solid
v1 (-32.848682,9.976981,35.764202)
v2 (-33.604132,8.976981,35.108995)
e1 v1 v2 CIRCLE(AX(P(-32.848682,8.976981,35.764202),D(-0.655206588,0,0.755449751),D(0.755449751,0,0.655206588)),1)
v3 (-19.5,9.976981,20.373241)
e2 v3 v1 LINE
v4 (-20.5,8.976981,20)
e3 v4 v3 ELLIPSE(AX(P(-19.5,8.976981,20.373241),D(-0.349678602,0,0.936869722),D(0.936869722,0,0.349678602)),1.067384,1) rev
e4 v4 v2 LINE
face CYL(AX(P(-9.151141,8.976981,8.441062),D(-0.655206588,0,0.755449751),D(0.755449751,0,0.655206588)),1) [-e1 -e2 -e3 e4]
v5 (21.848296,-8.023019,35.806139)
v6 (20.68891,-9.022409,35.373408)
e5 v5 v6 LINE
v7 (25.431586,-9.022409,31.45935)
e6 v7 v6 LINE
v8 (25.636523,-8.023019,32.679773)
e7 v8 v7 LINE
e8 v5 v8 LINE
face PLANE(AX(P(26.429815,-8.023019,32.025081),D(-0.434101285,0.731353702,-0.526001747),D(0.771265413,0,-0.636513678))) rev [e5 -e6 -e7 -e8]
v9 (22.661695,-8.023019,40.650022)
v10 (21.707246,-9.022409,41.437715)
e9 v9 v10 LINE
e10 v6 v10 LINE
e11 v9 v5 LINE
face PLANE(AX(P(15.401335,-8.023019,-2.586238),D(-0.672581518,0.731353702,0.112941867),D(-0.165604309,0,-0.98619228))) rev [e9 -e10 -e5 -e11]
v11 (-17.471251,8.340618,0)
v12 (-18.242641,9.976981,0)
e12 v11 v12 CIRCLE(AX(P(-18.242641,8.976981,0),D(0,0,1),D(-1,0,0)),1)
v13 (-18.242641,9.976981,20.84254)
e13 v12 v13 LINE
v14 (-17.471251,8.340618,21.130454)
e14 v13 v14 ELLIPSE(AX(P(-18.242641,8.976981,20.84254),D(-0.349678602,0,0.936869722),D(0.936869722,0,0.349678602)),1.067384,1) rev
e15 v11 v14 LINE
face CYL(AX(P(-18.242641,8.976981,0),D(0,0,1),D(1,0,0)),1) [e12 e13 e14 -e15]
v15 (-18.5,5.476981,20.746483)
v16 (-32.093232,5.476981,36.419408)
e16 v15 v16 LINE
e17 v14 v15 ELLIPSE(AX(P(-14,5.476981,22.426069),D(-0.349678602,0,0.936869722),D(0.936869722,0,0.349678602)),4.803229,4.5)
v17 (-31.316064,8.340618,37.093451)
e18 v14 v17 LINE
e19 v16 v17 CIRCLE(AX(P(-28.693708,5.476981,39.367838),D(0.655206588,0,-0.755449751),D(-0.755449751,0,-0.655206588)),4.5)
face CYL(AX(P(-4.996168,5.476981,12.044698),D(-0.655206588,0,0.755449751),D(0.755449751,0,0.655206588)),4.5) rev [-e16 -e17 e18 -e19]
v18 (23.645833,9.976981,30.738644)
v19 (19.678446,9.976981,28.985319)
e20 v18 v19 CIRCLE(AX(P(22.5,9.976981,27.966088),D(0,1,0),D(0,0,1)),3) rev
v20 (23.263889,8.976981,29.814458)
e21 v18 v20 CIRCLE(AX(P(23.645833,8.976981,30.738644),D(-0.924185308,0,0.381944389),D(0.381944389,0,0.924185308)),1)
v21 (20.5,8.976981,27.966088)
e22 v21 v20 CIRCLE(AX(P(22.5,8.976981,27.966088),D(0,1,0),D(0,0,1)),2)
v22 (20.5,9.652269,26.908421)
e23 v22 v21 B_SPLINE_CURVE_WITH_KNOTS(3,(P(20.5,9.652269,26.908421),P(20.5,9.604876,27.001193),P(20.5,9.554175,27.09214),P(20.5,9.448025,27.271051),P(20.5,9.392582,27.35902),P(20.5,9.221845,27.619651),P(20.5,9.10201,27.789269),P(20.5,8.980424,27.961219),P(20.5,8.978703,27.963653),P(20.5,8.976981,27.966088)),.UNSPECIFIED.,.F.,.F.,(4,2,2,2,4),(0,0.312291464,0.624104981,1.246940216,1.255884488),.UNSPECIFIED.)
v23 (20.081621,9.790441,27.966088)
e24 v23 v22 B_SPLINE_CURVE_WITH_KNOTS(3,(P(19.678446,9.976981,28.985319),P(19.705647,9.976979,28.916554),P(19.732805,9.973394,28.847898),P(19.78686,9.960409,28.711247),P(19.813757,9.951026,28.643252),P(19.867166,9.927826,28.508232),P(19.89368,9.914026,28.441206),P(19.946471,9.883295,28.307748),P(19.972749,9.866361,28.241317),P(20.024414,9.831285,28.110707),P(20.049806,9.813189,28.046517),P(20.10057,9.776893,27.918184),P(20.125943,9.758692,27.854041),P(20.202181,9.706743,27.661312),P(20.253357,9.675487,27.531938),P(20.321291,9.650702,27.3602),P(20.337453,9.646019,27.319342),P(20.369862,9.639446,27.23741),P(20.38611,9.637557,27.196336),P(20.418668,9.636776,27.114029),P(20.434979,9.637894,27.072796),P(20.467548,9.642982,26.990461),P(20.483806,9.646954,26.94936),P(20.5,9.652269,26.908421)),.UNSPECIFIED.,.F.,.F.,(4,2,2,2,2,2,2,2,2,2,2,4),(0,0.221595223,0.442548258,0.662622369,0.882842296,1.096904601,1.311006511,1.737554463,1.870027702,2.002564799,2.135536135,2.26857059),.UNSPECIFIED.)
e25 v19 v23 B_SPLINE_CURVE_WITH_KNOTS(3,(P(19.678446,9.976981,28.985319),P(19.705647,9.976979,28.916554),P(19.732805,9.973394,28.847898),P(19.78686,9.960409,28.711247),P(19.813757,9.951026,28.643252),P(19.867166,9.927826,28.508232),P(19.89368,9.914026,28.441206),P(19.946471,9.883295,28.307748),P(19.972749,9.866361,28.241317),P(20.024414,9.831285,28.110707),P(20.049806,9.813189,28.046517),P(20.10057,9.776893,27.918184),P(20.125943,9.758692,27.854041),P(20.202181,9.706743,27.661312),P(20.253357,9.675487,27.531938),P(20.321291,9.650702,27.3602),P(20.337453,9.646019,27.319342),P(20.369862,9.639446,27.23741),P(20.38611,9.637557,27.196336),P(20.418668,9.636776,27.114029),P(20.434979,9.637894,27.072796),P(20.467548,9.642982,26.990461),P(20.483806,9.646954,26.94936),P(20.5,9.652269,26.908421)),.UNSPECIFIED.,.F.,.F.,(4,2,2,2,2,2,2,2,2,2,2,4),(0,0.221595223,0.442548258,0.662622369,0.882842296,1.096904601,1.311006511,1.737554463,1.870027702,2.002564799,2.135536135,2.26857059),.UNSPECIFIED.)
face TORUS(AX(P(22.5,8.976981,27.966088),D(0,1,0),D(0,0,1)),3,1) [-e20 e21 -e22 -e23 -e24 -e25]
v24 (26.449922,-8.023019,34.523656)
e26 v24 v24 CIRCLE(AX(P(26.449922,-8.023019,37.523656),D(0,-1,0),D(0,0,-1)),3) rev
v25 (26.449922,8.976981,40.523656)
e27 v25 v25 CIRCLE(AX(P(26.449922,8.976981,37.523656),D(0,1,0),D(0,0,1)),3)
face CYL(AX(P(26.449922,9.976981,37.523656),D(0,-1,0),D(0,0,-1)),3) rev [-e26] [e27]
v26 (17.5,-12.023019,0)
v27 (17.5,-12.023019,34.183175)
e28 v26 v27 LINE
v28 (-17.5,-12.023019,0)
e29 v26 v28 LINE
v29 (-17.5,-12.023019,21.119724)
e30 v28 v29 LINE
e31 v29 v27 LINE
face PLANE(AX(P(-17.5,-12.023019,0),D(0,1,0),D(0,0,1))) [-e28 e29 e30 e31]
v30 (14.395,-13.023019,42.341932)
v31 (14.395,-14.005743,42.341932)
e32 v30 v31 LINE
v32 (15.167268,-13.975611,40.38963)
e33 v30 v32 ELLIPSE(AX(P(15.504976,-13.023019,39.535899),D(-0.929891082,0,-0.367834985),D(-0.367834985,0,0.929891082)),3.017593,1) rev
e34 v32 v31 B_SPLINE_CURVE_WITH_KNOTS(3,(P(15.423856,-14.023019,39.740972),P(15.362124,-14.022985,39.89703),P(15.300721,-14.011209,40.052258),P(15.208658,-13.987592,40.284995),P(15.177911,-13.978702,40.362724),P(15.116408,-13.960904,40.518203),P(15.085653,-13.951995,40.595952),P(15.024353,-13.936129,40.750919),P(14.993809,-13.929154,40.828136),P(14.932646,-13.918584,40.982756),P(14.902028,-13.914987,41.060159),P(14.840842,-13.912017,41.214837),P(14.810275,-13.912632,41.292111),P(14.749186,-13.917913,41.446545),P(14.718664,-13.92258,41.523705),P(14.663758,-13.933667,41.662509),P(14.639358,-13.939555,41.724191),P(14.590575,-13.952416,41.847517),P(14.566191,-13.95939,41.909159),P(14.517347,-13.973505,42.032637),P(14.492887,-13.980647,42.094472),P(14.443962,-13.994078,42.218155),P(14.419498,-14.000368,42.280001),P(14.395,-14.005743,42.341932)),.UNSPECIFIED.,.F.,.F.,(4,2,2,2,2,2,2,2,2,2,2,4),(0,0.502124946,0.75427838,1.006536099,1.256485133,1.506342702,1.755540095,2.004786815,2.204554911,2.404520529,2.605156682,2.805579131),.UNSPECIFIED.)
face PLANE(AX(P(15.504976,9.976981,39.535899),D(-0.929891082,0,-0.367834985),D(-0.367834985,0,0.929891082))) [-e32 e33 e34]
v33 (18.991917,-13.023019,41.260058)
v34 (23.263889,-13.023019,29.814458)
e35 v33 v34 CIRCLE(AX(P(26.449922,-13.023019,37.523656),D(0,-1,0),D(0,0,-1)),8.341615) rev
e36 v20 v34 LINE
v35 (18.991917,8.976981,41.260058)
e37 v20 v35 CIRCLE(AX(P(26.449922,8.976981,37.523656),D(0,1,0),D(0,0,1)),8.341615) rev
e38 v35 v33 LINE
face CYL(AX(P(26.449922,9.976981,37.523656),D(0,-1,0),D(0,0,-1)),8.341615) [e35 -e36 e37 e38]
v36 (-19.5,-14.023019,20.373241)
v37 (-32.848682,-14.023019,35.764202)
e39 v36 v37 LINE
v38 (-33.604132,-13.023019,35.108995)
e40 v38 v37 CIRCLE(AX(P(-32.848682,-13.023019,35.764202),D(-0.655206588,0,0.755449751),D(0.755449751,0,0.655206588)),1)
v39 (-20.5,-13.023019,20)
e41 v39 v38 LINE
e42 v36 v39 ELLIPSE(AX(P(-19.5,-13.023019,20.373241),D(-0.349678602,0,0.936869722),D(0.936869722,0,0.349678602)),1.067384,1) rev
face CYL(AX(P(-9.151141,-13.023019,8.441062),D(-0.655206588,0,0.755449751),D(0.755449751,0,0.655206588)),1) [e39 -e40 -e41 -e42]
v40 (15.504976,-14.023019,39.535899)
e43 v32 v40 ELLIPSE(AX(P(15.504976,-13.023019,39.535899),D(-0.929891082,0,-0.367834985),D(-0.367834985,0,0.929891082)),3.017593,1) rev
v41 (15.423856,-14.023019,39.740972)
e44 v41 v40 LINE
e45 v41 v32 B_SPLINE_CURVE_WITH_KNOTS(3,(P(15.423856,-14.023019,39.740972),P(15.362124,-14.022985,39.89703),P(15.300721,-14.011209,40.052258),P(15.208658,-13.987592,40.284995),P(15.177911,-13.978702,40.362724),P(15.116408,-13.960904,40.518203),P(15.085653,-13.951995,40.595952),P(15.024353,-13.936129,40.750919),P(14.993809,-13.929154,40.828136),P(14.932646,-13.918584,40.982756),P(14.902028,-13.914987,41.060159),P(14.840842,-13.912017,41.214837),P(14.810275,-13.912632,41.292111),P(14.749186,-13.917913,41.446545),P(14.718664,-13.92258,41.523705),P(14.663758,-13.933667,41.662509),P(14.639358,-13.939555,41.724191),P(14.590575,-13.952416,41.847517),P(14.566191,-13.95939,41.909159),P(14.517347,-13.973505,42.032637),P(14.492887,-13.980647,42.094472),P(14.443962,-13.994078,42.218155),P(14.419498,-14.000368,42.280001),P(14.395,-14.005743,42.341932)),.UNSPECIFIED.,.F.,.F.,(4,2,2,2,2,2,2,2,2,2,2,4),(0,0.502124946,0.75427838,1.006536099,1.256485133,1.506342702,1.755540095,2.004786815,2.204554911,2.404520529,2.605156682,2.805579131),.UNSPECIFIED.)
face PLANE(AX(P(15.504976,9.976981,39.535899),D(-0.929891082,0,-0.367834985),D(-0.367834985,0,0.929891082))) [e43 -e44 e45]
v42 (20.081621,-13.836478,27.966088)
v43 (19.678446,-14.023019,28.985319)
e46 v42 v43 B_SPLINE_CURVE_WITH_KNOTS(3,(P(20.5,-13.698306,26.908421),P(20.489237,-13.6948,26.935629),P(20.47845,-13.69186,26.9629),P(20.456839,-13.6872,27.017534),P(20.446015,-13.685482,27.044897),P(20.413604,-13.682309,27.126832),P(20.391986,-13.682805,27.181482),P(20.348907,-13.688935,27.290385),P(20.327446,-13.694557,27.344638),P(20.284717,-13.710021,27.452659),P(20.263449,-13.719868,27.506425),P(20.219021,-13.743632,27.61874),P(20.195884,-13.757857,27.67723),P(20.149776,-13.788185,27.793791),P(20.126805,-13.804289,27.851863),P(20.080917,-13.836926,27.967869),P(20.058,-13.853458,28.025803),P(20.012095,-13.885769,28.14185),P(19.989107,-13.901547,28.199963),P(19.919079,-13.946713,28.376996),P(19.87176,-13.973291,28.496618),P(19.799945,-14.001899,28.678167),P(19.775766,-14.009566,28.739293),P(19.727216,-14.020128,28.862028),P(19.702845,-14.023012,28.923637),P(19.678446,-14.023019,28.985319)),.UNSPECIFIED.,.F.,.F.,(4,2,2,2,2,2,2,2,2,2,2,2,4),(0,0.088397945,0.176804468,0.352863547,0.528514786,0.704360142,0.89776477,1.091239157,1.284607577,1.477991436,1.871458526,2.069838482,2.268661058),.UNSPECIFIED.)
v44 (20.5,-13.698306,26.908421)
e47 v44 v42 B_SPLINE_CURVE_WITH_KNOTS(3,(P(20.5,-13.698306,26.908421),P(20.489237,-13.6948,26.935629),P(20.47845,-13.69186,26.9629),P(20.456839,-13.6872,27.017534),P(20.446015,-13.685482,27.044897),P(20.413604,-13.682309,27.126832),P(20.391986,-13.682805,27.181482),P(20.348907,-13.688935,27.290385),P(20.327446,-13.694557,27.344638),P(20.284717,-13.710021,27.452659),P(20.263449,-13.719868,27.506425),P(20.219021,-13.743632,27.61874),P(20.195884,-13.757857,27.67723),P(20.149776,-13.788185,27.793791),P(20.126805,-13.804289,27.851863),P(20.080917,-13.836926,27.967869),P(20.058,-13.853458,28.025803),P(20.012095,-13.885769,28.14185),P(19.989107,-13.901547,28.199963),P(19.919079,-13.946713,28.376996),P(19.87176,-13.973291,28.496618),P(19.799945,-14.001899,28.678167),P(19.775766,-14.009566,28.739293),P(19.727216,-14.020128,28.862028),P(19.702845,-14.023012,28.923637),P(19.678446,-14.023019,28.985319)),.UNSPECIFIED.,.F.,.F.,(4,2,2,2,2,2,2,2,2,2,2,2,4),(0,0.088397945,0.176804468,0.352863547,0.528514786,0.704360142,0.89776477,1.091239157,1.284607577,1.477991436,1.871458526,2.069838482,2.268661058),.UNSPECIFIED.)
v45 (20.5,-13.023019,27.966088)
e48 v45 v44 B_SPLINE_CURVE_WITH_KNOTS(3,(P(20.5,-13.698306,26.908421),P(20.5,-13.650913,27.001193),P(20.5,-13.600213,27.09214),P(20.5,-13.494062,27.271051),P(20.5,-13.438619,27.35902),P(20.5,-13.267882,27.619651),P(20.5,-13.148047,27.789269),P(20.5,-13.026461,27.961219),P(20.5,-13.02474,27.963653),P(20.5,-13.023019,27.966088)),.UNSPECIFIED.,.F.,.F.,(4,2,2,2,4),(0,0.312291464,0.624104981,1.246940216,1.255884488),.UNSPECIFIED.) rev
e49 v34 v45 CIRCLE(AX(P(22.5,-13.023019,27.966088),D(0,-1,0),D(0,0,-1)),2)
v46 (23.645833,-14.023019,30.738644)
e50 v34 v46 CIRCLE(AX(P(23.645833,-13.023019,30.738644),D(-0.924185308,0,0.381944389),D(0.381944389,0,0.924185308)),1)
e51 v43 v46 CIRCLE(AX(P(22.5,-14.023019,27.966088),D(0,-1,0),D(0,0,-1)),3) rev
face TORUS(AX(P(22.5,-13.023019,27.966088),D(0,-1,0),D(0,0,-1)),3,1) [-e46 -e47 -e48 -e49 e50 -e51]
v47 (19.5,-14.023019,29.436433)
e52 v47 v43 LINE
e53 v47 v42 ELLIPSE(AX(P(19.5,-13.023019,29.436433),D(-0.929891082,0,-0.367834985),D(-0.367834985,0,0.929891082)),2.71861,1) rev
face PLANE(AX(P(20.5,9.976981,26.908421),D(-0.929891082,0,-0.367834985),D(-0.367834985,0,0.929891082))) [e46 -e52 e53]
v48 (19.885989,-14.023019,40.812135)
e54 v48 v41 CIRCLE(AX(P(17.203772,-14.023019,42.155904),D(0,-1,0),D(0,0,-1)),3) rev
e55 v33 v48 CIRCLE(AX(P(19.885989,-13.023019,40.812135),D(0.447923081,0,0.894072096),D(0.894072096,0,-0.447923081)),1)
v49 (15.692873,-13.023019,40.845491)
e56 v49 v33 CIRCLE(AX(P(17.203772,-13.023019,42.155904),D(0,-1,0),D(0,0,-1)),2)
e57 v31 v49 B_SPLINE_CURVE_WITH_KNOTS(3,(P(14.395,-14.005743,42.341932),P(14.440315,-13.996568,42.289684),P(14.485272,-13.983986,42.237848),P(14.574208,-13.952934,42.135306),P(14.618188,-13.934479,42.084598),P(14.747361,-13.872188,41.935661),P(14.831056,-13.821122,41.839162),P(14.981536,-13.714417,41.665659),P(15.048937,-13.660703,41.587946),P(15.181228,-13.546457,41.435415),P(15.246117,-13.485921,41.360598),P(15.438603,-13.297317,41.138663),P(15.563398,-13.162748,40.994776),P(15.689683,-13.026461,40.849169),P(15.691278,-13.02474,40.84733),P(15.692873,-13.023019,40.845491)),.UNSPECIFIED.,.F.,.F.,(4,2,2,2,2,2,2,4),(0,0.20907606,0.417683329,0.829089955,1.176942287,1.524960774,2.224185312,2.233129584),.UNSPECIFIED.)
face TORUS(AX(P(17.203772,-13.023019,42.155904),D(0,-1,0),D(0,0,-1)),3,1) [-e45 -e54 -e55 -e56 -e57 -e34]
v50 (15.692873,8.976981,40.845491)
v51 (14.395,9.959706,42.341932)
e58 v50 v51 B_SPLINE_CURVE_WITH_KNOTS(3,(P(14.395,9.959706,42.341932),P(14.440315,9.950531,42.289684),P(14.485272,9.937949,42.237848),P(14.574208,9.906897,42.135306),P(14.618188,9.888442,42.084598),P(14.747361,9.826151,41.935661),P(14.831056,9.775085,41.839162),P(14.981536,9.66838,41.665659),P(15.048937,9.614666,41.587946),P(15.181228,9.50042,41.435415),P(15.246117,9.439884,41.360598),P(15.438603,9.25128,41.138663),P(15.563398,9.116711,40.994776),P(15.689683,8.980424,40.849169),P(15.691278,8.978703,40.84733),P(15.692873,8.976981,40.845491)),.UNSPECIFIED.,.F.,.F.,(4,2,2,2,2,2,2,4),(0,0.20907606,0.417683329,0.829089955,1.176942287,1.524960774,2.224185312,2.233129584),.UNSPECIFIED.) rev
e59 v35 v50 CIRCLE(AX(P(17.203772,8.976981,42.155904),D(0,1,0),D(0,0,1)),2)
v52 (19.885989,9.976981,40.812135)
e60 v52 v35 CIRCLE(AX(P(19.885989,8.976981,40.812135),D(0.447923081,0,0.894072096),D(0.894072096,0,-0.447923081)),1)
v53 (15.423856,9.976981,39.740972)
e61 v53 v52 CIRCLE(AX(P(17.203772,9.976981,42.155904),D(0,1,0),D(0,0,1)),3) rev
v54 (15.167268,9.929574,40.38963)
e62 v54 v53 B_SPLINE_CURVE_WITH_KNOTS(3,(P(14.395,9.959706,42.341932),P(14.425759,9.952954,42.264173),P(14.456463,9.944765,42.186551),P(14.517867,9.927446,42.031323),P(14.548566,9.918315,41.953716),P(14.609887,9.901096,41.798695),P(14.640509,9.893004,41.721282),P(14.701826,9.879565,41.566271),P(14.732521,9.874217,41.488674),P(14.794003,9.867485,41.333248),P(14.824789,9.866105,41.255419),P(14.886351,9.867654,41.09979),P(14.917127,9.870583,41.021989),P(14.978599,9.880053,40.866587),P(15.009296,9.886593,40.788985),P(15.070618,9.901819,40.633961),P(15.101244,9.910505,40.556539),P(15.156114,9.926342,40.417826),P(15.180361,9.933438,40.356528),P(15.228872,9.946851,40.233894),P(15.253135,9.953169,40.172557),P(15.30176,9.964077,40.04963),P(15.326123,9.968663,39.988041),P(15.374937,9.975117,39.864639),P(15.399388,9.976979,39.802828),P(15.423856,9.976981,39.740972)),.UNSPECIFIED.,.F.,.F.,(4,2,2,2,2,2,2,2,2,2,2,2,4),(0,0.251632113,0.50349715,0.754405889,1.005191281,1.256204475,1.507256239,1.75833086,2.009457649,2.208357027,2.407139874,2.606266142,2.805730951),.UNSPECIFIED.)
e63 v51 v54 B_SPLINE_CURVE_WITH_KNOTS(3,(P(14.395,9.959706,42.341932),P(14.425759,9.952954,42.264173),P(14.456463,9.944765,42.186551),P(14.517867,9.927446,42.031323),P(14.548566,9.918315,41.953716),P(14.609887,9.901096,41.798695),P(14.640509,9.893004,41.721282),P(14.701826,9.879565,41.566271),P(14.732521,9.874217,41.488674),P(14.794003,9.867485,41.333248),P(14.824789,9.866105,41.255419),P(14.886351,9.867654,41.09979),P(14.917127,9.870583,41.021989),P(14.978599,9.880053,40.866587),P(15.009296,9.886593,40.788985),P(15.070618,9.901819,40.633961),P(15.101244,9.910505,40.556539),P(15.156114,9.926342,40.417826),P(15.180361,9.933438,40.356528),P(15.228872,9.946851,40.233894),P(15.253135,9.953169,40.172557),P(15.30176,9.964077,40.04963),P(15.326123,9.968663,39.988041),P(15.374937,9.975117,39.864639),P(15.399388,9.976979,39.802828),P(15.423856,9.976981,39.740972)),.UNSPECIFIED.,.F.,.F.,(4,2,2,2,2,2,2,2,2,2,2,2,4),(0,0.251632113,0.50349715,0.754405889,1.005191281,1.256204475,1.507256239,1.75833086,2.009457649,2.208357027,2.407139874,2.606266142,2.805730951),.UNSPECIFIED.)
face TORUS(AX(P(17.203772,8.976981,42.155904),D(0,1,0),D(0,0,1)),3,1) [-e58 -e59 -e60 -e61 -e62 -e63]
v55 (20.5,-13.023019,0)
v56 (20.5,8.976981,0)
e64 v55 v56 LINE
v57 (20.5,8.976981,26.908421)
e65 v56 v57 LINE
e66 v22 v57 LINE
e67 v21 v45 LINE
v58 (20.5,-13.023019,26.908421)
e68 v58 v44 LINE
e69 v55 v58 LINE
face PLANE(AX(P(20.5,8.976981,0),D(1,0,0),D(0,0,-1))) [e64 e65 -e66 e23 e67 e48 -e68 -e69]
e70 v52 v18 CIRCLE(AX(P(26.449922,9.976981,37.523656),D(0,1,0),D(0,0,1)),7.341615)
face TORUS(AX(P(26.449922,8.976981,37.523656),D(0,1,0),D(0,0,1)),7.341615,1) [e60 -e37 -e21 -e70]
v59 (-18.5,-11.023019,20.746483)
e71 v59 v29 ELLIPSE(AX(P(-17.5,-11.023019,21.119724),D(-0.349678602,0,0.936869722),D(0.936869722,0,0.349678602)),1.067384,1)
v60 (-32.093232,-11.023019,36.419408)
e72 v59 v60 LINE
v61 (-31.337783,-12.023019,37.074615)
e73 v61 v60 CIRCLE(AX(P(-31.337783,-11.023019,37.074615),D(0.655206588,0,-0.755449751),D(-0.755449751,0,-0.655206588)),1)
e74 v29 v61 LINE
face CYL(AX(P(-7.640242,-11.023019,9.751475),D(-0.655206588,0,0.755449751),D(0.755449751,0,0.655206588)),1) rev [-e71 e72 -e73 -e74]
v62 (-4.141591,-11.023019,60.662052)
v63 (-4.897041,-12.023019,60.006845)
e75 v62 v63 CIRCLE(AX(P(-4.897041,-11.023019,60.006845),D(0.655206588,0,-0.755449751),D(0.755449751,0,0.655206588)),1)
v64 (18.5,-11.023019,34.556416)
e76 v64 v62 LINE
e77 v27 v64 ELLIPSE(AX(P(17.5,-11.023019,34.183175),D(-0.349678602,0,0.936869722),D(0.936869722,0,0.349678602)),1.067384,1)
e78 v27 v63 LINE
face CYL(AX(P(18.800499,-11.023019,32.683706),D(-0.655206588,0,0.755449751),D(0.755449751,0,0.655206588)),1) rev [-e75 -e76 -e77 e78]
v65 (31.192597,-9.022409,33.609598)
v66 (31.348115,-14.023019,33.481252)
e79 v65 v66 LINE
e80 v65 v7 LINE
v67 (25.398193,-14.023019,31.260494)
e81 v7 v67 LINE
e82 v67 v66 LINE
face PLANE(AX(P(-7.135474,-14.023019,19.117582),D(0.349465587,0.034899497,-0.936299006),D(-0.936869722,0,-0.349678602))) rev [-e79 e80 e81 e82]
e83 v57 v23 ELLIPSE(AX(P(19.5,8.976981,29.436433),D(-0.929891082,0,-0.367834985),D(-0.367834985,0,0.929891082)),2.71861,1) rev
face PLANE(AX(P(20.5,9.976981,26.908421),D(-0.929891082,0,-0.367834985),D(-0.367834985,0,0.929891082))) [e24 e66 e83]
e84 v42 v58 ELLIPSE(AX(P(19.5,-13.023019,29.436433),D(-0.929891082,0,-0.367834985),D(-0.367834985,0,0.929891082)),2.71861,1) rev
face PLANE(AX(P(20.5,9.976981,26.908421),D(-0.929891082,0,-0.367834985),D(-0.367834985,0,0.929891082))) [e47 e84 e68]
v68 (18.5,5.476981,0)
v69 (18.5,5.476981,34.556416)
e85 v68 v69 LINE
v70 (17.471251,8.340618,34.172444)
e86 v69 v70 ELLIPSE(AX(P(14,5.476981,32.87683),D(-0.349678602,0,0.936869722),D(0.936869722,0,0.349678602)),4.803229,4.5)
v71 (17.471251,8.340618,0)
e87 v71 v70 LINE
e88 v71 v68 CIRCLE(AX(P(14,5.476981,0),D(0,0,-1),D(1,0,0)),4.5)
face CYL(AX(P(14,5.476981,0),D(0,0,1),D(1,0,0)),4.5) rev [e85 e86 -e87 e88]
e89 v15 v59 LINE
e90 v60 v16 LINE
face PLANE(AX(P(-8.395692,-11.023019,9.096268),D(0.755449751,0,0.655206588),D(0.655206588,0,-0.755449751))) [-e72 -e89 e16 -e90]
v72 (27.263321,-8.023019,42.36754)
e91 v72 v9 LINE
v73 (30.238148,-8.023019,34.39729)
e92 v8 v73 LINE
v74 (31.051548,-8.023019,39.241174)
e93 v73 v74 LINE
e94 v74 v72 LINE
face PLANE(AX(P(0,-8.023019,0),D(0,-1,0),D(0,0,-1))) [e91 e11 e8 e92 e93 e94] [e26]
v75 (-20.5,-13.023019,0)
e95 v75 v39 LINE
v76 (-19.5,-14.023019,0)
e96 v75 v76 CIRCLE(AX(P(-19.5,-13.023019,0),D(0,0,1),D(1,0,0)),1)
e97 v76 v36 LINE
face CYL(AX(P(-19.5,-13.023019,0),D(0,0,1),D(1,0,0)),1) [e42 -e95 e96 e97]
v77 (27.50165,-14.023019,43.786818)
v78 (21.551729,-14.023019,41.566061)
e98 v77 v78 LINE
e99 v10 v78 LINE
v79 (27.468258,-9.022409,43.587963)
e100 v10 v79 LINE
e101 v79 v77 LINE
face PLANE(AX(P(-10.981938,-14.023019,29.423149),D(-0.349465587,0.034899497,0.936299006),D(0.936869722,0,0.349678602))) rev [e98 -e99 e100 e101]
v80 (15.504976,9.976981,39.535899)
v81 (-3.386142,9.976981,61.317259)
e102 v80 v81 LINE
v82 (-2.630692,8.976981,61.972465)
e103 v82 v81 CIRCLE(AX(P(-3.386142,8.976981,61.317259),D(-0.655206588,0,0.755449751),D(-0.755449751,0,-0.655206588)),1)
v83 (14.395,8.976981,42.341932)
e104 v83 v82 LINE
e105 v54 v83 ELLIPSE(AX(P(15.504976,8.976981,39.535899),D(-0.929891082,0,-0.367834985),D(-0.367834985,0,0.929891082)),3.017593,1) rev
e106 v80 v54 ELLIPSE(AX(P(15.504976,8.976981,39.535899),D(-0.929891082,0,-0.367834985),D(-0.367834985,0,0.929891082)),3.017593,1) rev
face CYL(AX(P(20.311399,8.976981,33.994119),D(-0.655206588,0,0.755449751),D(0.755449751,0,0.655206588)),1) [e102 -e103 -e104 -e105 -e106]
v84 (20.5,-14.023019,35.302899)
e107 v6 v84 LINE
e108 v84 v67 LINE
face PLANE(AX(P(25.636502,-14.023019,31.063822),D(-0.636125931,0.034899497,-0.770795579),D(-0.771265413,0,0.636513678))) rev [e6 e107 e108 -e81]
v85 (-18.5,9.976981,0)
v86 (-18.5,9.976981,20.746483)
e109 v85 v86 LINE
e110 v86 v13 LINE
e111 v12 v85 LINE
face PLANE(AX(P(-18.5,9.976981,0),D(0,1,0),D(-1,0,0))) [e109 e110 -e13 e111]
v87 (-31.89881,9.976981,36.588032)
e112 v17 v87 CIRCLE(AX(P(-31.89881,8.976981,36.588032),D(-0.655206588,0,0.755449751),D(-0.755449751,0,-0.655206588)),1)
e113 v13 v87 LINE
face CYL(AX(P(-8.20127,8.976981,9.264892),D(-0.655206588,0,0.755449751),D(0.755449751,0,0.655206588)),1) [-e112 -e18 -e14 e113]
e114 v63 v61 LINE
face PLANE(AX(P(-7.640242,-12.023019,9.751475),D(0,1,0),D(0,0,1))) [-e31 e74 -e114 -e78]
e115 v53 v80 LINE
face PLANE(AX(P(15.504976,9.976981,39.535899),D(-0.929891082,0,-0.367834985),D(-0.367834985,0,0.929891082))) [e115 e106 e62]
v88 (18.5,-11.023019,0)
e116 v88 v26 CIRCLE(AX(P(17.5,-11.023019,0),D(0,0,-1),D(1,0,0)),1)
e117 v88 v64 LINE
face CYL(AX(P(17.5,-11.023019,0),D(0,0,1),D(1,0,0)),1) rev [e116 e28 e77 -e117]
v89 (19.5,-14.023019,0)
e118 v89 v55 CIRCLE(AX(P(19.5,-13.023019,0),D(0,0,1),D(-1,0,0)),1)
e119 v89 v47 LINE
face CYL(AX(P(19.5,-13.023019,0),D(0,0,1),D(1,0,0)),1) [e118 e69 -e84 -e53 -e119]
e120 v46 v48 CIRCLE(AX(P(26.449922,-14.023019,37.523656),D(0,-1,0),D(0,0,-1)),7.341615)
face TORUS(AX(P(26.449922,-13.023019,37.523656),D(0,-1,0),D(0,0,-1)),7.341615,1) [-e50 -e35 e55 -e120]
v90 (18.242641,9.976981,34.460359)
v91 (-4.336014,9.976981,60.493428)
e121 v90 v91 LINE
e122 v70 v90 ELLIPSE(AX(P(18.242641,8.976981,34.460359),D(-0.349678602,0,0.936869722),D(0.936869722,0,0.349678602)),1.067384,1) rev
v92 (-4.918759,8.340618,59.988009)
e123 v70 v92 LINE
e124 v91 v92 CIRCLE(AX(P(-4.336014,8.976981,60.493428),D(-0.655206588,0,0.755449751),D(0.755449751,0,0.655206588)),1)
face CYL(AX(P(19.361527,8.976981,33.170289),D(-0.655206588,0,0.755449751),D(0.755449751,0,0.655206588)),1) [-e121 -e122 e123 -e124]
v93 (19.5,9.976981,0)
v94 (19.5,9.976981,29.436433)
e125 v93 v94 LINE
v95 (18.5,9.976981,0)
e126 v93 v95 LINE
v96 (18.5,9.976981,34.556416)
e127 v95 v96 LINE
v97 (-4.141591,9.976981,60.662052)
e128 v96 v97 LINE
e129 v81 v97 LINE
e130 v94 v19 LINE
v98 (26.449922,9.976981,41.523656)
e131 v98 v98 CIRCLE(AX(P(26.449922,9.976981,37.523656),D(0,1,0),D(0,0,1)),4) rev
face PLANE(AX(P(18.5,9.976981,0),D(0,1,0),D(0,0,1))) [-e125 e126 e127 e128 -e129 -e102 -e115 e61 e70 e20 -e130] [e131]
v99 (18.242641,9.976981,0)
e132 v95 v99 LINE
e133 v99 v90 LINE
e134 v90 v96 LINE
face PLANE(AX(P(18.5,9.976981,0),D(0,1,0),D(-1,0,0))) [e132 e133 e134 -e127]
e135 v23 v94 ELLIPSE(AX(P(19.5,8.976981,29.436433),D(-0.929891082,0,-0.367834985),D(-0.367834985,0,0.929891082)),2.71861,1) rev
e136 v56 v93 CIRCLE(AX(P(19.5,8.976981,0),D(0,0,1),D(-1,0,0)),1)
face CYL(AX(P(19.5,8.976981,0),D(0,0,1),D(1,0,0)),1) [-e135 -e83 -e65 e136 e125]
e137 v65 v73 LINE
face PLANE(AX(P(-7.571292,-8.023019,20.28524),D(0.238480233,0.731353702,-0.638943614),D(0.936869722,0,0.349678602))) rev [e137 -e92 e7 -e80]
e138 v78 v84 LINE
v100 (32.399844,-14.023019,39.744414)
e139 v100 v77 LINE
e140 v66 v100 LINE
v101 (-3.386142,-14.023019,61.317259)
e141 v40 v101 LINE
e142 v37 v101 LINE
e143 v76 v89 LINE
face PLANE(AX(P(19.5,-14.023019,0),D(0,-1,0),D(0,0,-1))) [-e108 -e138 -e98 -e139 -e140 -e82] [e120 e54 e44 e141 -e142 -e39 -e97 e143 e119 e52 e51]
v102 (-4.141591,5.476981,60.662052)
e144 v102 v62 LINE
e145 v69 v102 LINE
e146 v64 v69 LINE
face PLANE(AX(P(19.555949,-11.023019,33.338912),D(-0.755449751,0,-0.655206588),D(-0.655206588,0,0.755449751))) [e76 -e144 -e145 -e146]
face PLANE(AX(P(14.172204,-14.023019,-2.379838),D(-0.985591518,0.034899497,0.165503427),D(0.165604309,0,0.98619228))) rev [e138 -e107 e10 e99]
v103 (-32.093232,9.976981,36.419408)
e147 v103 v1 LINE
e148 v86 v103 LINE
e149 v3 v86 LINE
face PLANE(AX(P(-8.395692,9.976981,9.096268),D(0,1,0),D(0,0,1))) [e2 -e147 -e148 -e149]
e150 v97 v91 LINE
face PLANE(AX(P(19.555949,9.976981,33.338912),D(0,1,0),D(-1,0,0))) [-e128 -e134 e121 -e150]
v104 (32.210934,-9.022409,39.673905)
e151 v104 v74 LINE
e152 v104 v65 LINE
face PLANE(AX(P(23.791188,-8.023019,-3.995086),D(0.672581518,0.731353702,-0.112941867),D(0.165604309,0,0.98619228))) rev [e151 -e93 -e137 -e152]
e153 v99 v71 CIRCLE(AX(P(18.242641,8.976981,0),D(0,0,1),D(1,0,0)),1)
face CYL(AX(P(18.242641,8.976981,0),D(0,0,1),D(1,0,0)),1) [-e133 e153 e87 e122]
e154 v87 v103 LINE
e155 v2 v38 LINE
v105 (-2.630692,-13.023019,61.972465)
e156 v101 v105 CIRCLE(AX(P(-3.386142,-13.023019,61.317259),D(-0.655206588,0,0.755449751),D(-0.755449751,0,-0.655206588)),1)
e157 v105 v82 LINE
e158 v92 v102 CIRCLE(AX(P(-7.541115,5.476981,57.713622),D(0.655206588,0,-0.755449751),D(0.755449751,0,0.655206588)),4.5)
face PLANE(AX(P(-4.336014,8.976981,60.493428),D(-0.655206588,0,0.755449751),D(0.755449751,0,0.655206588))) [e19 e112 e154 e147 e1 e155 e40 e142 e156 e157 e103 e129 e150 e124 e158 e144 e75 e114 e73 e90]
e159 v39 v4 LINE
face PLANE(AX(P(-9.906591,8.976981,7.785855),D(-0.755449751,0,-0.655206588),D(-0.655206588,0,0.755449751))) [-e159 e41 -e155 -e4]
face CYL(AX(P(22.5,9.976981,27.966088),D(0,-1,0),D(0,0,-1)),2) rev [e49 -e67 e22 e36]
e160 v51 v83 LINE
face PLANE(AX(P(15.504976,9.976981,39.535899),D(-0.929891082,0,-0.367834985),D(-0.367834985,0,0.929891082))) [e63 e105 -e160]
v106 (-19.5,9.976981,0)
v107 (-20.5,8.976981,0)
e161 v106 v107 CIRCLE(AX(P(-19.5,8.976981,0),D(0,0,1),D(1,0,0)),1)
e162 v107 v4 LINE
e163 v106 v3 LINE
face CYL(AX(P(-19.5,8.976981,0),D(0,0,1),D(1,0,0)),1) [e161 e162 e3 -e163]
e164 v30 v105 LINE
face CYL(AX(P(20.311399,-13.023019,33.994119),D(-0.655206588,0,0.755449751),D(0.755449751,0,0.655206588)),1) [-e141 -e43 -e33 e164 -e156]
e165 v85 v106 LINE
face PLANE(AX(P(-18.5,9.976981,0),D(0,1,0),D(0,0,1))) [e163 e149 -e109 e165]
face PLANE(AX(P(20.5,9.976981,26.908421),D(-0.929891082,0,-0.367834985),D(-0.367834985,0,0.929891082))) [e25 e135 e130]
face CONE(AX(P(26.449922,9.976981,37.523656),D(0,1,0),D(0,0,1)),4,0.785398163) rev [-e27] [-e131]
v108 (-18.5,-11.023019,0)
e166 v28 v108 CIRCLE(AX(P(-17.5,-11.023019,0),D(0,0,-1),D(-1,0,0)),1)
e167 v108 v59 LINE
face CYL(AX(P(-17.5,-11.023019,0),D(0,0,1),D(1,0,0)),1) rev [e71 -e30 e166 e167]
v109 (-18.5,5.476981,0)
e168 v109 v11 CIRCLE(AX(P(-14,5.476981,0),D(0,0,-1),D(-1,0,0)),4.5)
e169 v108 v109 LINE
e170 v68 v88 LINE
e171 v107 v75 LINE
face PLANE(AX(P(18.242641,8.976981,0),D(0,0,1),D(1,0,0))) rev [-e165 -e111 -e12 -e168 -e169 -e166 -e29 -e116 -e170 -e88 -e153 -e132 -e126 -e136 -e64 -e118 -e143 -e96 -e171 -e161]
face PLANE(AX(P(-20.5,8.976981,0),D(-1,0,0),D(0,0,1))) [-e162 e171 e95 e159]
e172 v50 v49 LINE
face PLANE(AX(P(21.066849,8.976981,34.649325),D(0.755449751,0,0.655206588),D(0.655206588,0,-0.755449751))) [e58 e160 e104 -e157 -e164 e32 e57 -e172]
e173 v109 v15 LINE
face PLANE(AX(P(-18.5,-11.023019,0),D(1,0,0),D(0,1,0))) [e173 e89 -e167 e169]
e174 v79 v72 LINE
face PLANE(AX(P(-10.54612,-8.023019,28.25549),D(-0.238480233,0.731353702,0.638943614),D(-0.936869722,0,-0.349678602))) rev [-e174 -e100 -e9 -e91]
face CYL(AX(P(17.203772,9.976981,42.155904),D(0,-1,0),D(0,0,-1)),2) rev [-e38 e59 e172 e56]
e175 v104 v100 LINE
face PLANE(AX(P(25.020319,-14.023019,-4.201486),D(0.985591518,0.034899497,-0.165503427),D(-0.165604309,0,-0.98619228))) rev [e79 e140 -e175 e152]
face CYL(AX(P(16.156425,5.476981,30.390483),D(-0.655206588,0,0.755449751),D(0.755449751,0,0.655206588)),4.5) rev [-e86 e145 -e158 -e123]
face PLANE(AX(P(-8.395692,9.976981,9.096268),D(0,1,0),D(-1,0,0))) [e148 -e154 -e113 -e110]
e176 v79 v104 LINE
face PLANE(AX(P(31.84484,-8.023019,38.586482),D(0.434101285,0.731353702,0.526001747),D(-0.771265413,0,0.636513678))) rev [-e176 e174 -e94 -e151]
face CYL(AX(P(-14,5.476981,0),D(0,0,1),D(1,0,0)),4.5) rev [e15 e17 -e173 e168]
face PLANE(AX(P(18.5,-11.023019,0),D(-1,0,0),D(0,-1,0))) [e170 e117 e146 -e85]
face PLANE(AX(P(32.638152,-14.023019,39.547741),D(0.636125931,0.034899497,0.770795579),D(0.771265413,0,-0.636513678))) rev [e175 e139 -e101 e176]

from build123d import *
from OCP.BRepFilletAPI import BRepFilletAPI_MakeChamfer

# Parameters (mm, degrees)
SKETCH4_R           = 3
BOSS_EXTRUDE2_DEPTH = 24
CUT_EXTRUDE2_DEPTH  = 6
CUT_EXTRUDE2_DRAFT  = -2
CHAMFER1_SIZE       = 1
CHAMFER1_SIZE2      = 1.036815955
FILLET2_R           = 1
FILLET3_R           = 1
CHAMFER2_SIZE       = 1


with BuildPart() as part:
    # Sweep1: sweep along a path in Sketch3
    with BuildLine(Plane(origin=(0, 0, 0), x_dir=(1, 0, 0), z_dir=(0, 1, 0))) as sweep1_path:
        Line((0, 0), (0, -27.651449467))
        Line((0, -27.651449467), (-18.11741187, -48.540730085))
    # Sketch1 → Sweep1 (sweep)
    with BuildSketch(Plane.XY):
        with BuildLine():
            Line((-17.5, -12.023018516), (17.5, -12.023018516))
            ThreePointArc((17.5, -12.023018516), (18.207106781, -11.730125297), (18.5, -11.023018516))
            Line((18.5, -11.023018516), (18.5, 5.476981484))
            ThreePointArc((18.5, 5.476981484), (18.235010721, 6.998390104), (17.471251471, 8.340617848))
            ThreePointArc((17.471251471, 8.340617848), (17.338106653, 9.403382917), (18.242640687, 9.976981484))
            Line((18.242640687, 9.976981484), (18.5, 9.976981484))
            Line((18.5, 9.976981484), (19.5, 9.976981484))
            ThreePointArc((19.5, 9.976981484), (20.207106781, 9.684088265), (20.5, 8.976981484))
            Line((20.5, 8.976981484), (20.5, -13.023018516))
            ThreePointArc((20.5, -13.023018516), (20.207106781, -13.730125297), (19.5, -14.023018516))
            Line((19.5, -14.023018516), (-19.5, -14.023018516))
            ThreePointArc((-19.5, -14.023018516), (-20.207106781, -13.730125297), (-20.5, -13.023018516))
            Line((-20.5, -13.023018516), (-20.5, 8.976981484))
            ThreePointArc((-20.5, 8.976981484), (-20.207106781, 9.684088265), (-19.5, 9.976981484))
            Line((-19.5, 9.976981484), (-18.5, 9.976981484))
            Line((-18.5, 9.976981484), (-18.242640687, 9.976981484))
            ThreePointArc((-18.242640687, 9.976981484), (-17.338106653, 9.403382917), (-17.471251471, 8.340617848))
            ThreePointArc((-17.471251471, 8.340617848), (-18.235010721, 6.998390104), (-18.5, 5.476981484))
            Line((-18.5, 5.476981484), (-18.5, -11.023018516))
            ThreePointArc((-18.5, -11.023018516), (-18.207106781, -11.730125297), (-17.5, -12.023018516))
        make_face()
    sweep(path=sweep1_path.line, transition=Transition.RIGHT)

    # Sketch4 → Boss-Extrude2 (add, through all)
    with BuildSketch(Plane(origin=(0, -14.023018516, 0), x_dir=(-1, 0, 0), z_dir=(0, -1, 0))):
        with BuildLine():
            Line((-20.5, -27.966087618), (-20.5, -26.908421005))
            Line((-20.5, -26.908421005), (-19.5, -29.43643253))
            Line((-19.5, -29.43643253), (-19.5, -34.929657496))
            Line((-19.5, -34.929657496), (-15.504976059, -39.535899093))
            Line((-15.504976059, -39.535899093), (-14.394999659, -42.341932225))
            Line((-14.394999659, -42.341932225), (-15.692872888, -40.845491216))
            ThreePointArc((-15.692872888, -40.845491216), (-17.453136797, -40.171510936), (-18.991916583, -41.260058232))
            ThreePointArc((-18.991916583, -41.260058232), (-34.264928426, -40.440540605), (-23.263888778, -29.814458234))
            ThreePointArc((-23.263888778, -29.814458234), (-21.388194612, -29.628582363), (-20.5, -27.966087618))
        make_face()
        with Locations(Location((-26.449921847, -37.523656316, 0), (0, 0, 90))):
            Circle(SKETCH4_R, mode=Mode.SUBTRACT)
    extrude(amount=-BOSS_EXTRUDE2_DEPTH)


with BuildPart() as cut_extrude2_tool:
    # Sketch5 → Cut-Extrude2 (with draft: the straight prism first)
    with BuildSketch(Plane(origin=(0, -14.023018516, 0), x_dir=(-1, 0, 0), z_dir=(0, -1, 0))):
        Polygon((-27.501650461, -43.786818477), (-21.551728614, -41.566061095), (-20.5, -35.302898934), (-25.398193232, -31.260494155), (-31.348115079, -33.481251538), (-32.399843693, -39.744413699), align=None)
    extrude(amount=-CUT_EXTRUDE2_DEPTH)
    # Cut-Extrude2: the draft: its side faces are tilted about the plane it starts from
    cut_extrude2_sides = [cut_extrude2_tool.faces().sort_by_distance(p)[0] for p in [
        (24.526689538, -11.023018516, 42.676439786),
        (21.025864307, -11.023018516, 38.434480014),
        (22.949096616, -11.023018516, 33.281696545),
        (28.373154156, -11.023018516, 32.370872847),
        (31.873979386, -11.023018516, 36.612832618),
        (29.950747077, -11.023018516, 41.765616088),
    ]]
    draft(cut_extrude2_sides, Plane(origin=(0, -14.023018516, 0), x_dir=(-1, 0, 0), z_dir=(0, -1, 0)), CUT_EXTRUDE2_DRAFT)


with BuildPart() as part_1:
    add(part.part)

    # Cut-Extrude2: cut by cut_extrude2_tool
    add(cut_extrude2_tool.part, mode=Mode.SUBTRACT)

    # Chamfer1: one chamfer whose edges measure the first distance from different faces: ONE call of the kernel's chamfer builder (chamfer() names one face for all edges)
    chamfer1_edges_1 = [part_1.edges().sort_by_distance(p)[0] for p in [
        (31.667347826, -8.023018516, 36.647530798),
    ]]
    chamfer1_side_1 = [part_1.faces().sort_by_distance(p)[0] for p in [
        (31.771332319, -11.042436068, 36.630069416),
    ]]
    chamfer1_edges_2 = [part_1.edges().sort_by_distance(p)[0] for p in [
        (28.29988788, -8.023018516, 32.567170116),
    ]]
    chamfer1_side_2 = [part_1.faces().sort_by_distance(p)[0] for p in [
        (28.336758127, -11.042436068, 32.468386213),
    ]]
    chamfer1_edges_3 = [part_1.edges().sort_by_distance(p)[0] for p in [
        (23.082461901, -8.023018516, 33.443295635),
    ]]
    chamfer1_side_3 = [part_1.faces().sort_by_distance(p)[0] for p in [
        (23.015347654, -11.042436068, 33.361973113),
    ]]
    chamfer1_edges_4 = [part_1.edges().sort_by_distance(p)[0] for p in [
        (21.232495867, -8.023018516, 38.399781835),
    ]]
    chamfer1_side_4 = [part_1.faces().sort_by_distance(p)[0] for p in [
        (21.128511374, -11.042436068, 38.417243217),
    ]]
    chamfer1_edges_5 = [part_1.edges().sort_by_distance(p)[0] for p in [
        (24.599955813, -8.023018516, 42.480142516),
    ]]
    chamfer1_side_5 = [part_1.faces().sort_by_distance(p)[0] for p in [
        (24.563085567, -11.042436068, 42.57892642),
    ]]
    chamfer1_edges_6 = [part_1.edges().sort_by_distance(p)[0] for p in [
        (29.817381793, -8.023018516, 41.604016998),
    ]]
    chamfer1_side_6 = [part_1.faces().sort_by_distance(p)[0] for p in [
        (29.884496039, -11.042436068, 41.685339519),
    ]]
    chamfer1 = BRepFilletAPI_MakeChamfer(part_1.part.solid().wrapped)
    for e in chamfer1_edges_1:
        chamfer1.Add(CHAMFER1_SIZE, CHAMFER1_SIZE2, e.wrapped, chamfer1_side_1[0].wrapped)  # the first distance lies on this face
    for e in chamfer1_edges_2:
        chamfer1.Add(CHAMFER1_SIZE, CHAMFER1_SIZE2, e.wrapped, chamfer1_side_2[0].wrapped)  # the first distance lies on this face
    for e in chamfer1_edges_3:
        chamfer1.Add(CHAMFER1_SIZE, CHAMFER1_SIZE2, e.wrapped, chamfer1_side_3[0].wrapped)  # the first distance lies on this face
    for e in chamfer1_edges_4:
        chamfer1.Add(CHAMFER1_SIZE, CHAMFER1_SIZE2, e.wrapped, chamfer1_side_4[0].wrapped)  # the first distance lies on this face
    for e in chamfer1_edges_5:
        chamfer1.Add(CHAMFER1_SIZE, CHAMFER1_SIZE2, e.wrapped, chamfer1_side_5[0].wrapped)  # the first distance lies on this face
    for e in chamfer1_edges_6:
        chamfer1.Add(CHAMFER1_SIZE, CHAMFER1_SIZE2, e.wrapped, chamfer1_side_6[0].wrapped)  # the first distance lies on this face
    add(Compound.cast(chamfer1.Shape()), mode=Mode.REPLACE)

    # Fillet2
    # the kernel refuses this fillet: 1 mm, written as the material it takes off along each edge
    with BuildSketch(Plane(origin=(22.5, 9.976981484, 27.966087618), x_dir=(0.3819443891792231, 0, 0.9241853080278383), z_dir=(0.9241853080278383, 0, -0.3819443891792231))) as fillet2_piece_1:
        with BuildLine():
            CenterArc((2 + FILLET2_R, FILLET2_R), FILLET2_R, 180, 90)
            Line((2 + FILLET2_R, 0), (2, 0))
            Line((2, 0), (2, FILLET2_R))
        make_face()
    revolve(axis=Axis((22.5, 9.976981484, 27.966087618), (0, -1, 0)), revolution_arc=184.118823056, mode=Mode.SUBTRACT)
    with BuildSketch(Plane(origin=(17.20377239, 9.976981484, 42.155904393), x_dir=(-0.859590792427854, 0, 0.5109830423539063), z_dir=(0.5109830423539063, 0, 0.859590792427854))) as fillet2_piece_2:
        with BuildLine():
            CenterArc((2 + FILLET2_R, FILLET2_R), FILLET2_R, 180, 90)
            Line((2 + FILLET2_R, 0), (2, 0))
            Line((2, 0), (2, FILLET2_R))
        make_face()
    revolve(axis=Axis((17.20377239, 9.976981484, 42.155904393), (0, -1, 0)), revolution_arc=184.118823056, mode=Mode.SUBTRACT)
    with BuildSketch(Plane(origin=(26.449921847, 9.976981484, 37.523656316), x_dir=(-0.8940720964908391, 0, 0.44792308075882376), z_dir=(-0.44792308075882376, 0, -0.8940720964908391))) as fillet2_piece_3:
        with BuildLine():
            CenterArc((8.341615059 - FILLET2_R, -FILLET2_R), FILLET2_R, 0, 90)
            Line((8.341615059 - FILLET2_R, 0), (8.341615059, 0))
            Line((8.341615059, 0), (8.341615059, -FILLET2_R))
        make_face()
    revolve(axis=Axis((26.449921847, 9.976981484, 37.523656316), (0, 1, 0)), revolution_arc=265.843665859, mode=Mode.SUBTRACT)

    # Fillet3
    # the kernel refuses this fillet: 1 mm, written as the material it takes off along each edge
    with BuildSketch(Plane(origin=(22.5, -14.023018516, 27.966087618), x_dir=(0.3819443891792231, 0, 0.9241853080278383), z_dir=(0.9241853080278383, 0, -0.3819443891792231))) as fillet3_piece_1:
        with BuildLine():
            CenterArc((2 + FILLET3_R, -FILLET3_R), FILLET3_R, 90, 90)
            Line((2, -FILLET3_R), (2, 0))
            Line((2, 0), (2 + FILLET3_R, 0))
        make_face()
    revolve(axis=Axis((22.5, -14.023018516, 27.966087618), (0, -1, 0)), revolution_arc=184.118823056, mode=Mode.SUBTRACT)
    with BuildSketch(Plane(origin=(17.20377239, -14.023018516, 42.155904393), x_dir=(-0.859590792427854, 0, 0.5109830423539063), z_dir=(0.5109830423539063, 0, 0.859590792427854))) as fillet3_piece_2:
        with BuildLine():
            CenterArc((2 + FILLET3_R, -FILLET3_R), FILLET3_R, 90, 90)
            Line((2, -FILLET3_R), (2, 0))
            Line((2, 0), (2 + FILLET3_R, 0))
        make_face()
    revolve(axis=Axis((17.20377239, -14.023018516, 42.155904393), (0, -1, 0)), revolution_arc=184.118823056, mode=Mode.SUBTRACT)
    with BuildSketch(Plane(origin=(26.449921847, -14.023018516, 37.523656316), x_dir=(-0.8940720964908391, 0, 0.44792308075882376), z_dir=(-0.44792308075882376, 0, -0.8940720964908391))) as fillet3_piece_3:
        with BuildLine():
            CenterArc((8.341615059 - FILLET3_R, FILLET3_R), FILLET3_R, 270, 90)
            Line((8.341615059, FILLET3_R), (8.341615059, 0))
            Line((8.341615059, 0), (8.341615059 - FILLET3_R, 0))
        make_face()
    revolve(axis=Axis((26.449921847, -14.023018516, 37.523656316), (0, 1, 0)), revolution_arc=265.843665859, mode=Mode.SUBTRACT)

    # Chamfer2
    chamfer2_edges = [part_1.edges().sort_by_distance(p)[0] for p in [
        (26.449921847, 9.976981484, 40.523656316),
    ]]
    chamfer(chamfer2_edges, length=CHAMFER2_SIZE)


solid = part_1.part
